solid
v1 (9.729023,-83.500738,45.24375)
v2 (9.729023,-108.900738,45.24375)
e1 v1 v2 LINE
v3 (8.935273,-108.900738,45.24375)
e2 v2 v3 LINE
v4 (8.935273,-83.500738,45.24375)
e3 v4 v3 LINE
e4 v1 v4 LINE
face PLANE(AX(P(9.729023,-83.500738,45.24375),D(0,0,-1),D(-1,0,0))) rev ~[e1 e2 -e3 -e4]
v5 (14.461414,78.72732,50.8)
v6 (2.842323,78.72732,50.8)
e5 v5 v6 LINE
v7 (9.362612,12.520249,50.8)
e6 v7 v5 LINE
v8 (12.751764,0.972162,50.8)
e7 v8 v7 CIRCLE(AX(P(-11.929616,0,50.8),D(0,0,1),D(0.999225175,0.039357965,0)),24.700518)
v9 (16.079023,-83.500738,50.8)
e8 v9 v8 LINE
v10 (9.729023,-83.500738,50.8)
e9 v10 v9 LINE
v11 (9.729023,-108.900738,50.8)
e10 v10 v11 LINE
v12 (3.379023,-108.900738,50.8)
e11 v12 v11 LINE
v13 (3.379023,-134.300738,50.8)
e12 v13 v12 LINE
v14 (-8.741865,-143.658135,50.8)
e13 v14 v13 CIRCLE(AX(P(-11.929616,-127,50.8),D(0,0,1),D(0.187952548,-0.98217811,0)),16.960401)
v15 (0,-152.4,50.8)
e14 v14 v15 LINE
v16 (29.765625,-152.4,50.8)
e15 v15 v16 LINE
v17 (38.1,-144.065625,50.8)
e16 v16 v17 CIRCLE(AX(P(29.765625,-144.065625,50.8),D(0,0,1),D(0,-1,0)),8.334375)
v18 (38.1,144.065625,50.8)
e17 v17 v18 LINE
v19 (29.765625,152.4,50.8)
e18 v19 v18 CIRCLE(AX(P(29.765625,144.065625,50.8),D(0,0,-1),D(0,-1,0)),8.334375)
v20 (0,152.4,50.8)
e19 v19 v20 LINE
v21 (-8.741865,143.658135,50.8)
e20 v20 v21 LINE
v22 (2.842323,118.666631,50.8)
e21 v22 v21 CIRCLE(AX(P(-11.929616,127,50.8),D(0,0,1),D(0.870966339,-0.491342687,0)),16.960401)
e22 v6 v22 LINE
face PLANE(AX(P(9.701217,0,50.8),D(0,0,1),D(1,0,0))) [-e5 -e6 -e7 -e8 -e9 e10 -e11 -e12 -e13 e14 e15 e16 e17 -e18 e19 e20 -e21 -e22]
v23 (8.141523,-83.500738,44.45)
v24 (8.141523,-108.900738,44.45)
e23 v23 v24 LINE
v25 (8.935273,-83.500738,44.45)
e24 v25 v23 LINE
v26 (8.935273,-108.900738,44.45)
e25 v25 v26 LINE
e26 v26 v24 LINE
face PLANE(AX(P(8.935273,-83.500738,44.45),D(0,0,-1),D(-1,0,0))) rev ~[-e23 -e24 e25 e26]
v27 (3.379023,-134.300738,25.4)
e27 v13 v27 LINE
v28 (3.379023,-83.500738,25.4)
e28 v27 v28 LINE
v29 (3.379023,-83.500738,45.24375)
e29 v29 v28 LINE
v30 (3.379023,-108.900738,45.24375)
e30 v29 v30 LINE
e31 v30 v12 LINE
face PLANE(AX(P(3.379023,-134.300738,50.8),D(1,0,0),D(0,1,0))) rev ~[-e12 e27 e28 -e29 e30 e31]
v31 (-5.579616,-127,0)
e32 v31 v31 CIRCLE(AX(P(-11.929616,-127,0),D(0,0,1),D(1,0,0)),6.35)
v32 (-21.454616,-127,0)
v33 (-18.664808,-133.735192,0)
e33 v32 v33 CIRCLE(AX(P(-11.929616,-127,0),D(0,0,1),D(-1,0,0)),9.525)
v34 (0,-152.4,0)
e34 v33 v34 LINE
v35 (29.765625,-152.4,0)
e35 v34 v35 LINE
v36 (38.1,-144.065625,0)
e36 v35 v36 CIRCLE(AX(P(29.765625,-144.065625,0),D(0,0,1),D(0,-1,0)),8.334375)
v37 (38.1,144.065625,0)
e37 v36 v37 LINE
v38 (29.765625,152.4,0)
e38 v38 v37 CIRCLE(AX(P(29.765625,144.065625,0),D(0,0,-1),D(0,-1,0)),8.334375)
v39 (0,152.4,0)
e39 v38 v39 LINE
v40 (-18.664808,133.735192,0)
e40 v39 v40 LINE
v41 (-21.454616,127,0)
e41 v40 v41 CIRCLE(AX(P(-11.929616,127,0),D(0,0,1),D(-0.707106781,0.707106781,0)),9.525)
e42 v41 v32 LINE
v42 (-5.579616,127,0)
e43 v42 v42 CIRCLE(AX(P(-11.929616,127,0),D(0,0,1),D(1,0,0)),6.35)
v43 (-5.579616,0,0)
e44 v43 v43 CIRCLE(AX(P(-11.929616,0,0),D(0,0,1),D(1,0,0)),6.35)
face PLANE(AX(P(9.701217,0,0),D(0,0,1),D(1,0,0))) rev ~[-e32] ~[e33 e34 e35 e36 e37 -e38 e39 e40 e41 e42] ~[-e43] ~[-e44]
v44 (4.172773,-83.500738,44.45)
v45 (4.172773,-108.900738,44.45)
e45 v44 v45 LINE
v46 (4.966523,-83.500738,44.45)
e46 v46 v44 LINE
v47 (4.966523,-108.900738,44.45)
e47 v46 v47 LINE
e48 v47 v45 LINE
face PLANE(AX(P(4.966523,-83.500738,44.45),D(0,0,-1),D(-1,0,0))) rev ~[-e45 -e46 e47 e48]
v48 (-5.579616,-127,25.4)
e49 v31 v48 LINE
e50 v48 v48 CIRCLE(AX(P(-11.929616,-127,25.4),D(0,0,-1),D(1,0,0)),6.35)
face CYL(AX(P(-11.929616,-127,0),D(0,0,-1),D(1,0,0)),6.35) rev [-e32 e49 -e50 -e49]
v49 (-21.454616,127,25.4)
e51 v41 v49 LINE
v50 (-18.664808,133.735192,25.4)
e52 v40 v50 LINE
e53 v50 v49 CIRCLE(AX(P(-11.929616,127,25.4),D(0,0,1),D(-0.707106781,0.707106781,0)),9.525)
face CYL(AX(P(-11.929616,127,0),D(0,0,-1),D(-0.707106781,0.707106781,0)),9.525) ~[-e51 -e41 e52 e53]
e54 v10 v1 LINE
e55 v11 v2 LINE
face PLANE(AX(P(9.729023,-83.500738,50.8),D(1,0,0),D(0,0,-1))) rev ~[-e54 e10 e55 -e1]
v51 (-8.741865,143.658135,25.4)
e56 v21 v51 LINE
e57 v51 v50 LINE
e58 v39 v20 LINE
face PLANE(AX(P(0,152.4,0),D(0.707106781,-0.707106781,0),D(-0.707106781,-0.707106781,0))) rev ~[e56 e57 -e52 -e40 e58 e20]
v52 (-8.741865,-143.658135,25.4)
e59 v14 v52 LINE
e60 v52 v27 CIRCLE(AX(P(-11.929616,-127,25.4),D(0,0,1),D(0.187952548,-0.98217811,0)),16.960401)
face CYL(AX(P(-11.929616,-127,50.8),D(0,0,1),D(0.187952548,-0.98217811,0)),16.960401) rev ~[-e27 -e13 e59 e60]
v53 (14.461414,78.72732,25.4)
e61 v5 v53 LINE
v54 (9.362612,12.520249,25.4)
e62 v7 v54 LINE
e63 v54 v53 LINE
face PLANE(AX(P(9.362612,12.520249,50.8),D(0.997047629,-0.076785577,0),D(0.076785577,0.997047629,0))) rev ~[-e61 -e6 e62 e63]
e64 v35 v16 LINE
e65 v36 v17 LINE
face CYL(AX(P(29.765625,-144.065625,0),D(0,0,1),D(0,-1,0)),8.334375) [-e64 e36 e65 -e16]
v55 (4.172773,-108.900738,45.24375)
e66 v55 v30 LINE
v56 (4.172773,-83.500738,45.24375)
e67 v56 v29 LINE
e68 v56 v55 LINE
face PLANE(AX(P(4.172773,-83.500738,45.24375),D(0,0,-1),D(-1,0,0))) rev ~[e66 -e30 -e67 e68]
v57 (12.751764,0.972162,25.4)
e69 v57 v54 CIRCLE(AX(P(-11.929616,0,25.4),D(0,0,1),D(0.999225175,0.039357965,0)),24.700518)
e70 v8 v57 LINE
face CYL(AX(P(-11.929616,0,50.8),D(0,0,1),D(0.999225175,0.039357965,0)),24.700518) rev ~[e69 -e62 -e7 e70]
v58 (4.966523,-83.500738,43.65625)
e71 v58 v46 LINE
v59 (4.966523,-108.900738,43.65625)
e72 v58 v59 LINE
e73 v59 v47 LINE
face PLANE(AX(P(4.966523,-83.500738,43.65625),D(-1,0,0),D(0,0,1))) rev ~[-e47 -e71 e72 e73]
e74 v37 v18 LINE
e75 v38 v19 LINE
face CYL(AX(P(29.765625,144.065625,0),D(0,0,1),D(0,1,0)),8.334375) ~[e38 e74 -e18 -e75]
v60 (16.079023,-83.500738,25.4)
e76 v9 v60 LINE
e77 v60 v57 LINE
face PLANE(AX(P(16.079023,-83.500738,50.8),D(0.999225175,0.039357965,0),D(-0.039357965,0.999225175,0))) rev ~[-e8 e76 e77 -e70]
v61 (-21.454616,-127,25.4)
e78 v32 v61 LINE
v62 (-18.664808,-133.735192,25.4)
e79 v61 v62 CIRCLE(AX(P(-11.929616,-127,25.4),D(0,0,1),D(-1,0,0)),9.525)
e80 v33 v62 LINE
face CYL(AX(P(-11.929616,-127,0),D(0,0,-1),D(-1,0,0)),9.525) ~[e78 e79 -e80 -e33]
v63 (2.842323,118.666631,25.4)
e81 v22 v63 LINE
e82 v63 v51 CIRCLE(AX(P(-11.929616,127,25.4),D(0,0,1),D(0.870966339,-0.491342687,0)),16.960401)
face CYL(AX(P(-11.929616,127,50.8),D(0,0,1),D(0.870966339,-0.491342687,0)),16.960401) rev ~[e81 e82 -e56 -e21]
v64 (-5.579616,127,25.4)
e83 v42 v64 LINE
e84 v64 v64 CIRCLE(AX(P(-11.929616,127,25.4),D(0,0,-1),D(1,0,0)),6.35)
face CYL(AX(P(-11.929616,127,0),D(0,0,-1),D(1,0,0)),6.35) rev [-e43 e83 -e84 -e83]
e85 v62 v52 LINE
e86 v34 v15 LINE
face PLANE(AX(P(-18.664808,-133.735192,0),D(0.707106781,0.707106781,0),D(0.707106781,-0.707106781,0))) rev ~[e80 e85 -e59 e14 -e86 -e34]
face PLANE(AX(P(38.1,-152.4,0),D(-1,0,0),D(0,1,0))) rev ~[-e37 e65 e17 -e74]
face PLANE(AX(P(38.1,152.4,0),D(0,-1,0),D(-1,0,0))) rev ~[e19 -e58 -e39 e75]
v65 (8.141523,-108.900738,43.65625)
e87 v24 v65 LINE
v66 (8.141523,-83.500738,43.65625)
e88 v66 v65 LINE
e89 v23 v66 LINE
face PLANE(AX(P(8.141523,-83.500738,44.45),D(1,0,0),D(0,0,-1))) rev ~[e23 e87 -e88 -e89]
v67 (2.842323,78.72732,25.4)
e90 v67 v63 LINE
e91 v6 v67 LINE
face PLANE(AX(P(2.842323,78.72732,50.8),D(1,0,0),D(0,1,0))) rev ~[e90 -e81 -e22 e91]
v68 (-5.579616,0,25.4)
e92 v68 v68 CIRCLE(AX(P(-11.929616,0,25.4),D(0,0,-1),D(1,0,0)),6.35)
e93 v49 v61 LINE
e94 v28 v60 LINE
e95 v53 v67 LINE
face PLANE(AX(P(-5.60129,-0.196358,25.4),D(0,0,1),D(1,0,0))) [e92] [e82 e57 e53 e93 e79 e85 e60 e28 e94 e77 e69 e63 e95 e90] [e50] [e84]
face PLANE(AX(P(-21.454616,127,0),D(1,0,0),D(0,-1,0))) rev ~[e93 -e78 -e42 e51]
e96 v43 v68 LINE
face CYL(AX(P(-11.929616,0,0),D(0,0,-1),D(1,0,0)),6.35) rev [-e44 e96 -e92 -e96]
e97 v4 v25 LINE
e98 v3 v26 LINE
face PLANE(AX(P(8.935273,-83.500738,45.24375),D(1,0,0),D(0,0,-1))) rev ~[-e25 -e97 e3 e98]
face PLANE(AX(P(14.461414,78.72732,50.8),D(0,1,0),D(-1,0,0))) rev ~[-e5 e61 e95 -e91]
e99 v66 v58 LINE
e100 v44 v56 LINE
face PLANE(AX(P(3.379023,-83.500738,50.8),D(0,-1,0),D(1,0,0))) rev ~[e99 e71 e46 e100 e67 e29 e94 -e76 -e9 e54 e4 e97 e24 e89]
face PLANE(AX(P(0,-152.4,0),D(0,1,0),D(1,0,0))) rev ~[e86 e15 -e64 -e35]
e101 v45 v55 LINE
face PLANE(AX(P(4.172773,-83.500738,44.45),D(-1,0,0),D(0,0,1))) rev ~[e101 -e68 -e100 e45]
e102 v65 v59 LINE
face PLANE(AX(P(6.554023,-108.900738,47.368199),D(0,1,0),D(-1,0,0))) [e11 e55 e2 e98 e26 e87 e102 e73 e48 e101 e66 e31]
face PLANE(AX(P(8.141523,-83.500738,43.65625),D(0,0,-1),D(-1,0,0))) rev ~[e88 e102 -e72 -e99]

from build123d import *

# Parameters (mm, degrees)
F0_R     = 6.35
F1_DEPTH = 50.8
F2_R     = 8.334375
F4_DEPTH = 25.4
F6_DEPTH = 25.4


with BuildPart() as f1:
    # F0 (on Top) → F1 (new body)
    with BuildSketch(Plane.XY):
        with BuildLine():
            Line((-21.4546158184, 127), (-21.4546158184, -127))
            ThreePointArc((-21.4546158184, -127), (-20.7295683656, -130.6450596933), (-18.6648079092, -133.7351920908))
            Line((-18.6648079092, -133.7351920908), (0, -152.4))
            Line((0, -152.4), (38.1, -152.4))
            Line((38.1, -152.4), (38.1, 152.4))
            Line((38.1, 152.4), (0, 152.4))
            Line((0, 152.4), (-18.6648079092, 133.7351920908))
            ThreePointArc((-18.6648079092, 133.7351920908), (-20.7295683656, 130.6450596933), (-21.4546158184, 127))
        make_face()
        with Locations((-11.9296158184, -127)):
            Circle(F0_R, mode=Mode.SUBTRACT)
        with Locations((-11.9296158184, 0)):
            Circle(F0_R, mode=Mode.SUBTRACT)
        with Locations((-11.9296158184, 127)):
            Circle(F0_R, mode=Mode.SUBTRACT)
    extrude(amount=F1_DEPTH)

    # F2
    f2_edges = [f1.edges().sort_by_distance(p)[0] for p in [
        (38.1, 152.4, 25.4),
        (38.1, -152.4, 25.4),
    ]]
    fillet(f2_edges, radius=F2_R)

    # F3 (on face) → F4 (cut)
    with BuildSketch(Plane.XY.offset(50.8)):
        with BuildLine():
            Line((-18.6648079092, -133.7351920908), (-8.741865195, -143.658134805))
            ThreePointArc((-8.741865195, -143.658134805), (-1.565286118, -140.4251956813), (3.379023496, -134.3007377408))
            Line((3.379023496, -134.3007377408), (3.379023496, -83.5007377408))
            Line((3.379023496, -83.5007377408), (16.079023496, -83.5007377408))
            Line((16.079023496, -83.5007377408), (12.7517639776, 0.9721621486))
            ThreePointArc((12.7517639776, 0.9721621486), (11.7712856877, 6.9557800194), (9.3626122843, 12.5202488115))
            Line((9.3626122843, 12.5202488115), (14.4614139572, 78.7273198366))
            Line((14.4614139572, 78.7273198366), (2.8423227302, 78.7273198366))
            Line((2.8423227302, 78.7273198366), (2.8423227302, 118.6666308892))
            ThreePointArc((2.8423227302, 118.6666308892), (3.4580879019, 134.1325860273), (-8.741865195, 143.658134805))
            Line((-8.741865195, 143.658134805), (-18.6648079092, 133.7351920908))
            ThreePointArc((-18.6648079092, 133.7351920908), (-20.7295683656, 130.6450596933), (-21.4546158184, 127))
            Line((-21.4546158184, 127), (-21.4546158184, -127))
            ThreePointArc((-21.4546158184, -127), (-20.7295683656, -130.6450596933), (-18.6648079092, -133.7351920908))
        make_face()
    extrude(amount=-F4_DEPTH, mode=Mode.SUBTRACT)

    # F5 (on face) → F6 (cut)
    with BuildSketch(Plane(origin=(0, -83.5007377408, 0), x_dir=(-1, 0, 0), z_dir=(0, 1, 0))):
        Polygon((-3.379023496, 50.8), (-9.729023496, 50.8), (-9.729023496, 45.24375), (-8.935273496, 45.24375), (-8.935273496, 44.45), (-8.141523496, 44.45), (-8.141523496, 43.65625), (-4.966523496, 43.65625), (-4.966523496, 44.45), (-4.172773496, 44.45), (-4.172773496, 45.24375), (-3.379023496, 45.24375), align=None)
    extrude(amount=-F6_DEPTH, mode=Mode.SUBTRACT)


solid = f1.part
